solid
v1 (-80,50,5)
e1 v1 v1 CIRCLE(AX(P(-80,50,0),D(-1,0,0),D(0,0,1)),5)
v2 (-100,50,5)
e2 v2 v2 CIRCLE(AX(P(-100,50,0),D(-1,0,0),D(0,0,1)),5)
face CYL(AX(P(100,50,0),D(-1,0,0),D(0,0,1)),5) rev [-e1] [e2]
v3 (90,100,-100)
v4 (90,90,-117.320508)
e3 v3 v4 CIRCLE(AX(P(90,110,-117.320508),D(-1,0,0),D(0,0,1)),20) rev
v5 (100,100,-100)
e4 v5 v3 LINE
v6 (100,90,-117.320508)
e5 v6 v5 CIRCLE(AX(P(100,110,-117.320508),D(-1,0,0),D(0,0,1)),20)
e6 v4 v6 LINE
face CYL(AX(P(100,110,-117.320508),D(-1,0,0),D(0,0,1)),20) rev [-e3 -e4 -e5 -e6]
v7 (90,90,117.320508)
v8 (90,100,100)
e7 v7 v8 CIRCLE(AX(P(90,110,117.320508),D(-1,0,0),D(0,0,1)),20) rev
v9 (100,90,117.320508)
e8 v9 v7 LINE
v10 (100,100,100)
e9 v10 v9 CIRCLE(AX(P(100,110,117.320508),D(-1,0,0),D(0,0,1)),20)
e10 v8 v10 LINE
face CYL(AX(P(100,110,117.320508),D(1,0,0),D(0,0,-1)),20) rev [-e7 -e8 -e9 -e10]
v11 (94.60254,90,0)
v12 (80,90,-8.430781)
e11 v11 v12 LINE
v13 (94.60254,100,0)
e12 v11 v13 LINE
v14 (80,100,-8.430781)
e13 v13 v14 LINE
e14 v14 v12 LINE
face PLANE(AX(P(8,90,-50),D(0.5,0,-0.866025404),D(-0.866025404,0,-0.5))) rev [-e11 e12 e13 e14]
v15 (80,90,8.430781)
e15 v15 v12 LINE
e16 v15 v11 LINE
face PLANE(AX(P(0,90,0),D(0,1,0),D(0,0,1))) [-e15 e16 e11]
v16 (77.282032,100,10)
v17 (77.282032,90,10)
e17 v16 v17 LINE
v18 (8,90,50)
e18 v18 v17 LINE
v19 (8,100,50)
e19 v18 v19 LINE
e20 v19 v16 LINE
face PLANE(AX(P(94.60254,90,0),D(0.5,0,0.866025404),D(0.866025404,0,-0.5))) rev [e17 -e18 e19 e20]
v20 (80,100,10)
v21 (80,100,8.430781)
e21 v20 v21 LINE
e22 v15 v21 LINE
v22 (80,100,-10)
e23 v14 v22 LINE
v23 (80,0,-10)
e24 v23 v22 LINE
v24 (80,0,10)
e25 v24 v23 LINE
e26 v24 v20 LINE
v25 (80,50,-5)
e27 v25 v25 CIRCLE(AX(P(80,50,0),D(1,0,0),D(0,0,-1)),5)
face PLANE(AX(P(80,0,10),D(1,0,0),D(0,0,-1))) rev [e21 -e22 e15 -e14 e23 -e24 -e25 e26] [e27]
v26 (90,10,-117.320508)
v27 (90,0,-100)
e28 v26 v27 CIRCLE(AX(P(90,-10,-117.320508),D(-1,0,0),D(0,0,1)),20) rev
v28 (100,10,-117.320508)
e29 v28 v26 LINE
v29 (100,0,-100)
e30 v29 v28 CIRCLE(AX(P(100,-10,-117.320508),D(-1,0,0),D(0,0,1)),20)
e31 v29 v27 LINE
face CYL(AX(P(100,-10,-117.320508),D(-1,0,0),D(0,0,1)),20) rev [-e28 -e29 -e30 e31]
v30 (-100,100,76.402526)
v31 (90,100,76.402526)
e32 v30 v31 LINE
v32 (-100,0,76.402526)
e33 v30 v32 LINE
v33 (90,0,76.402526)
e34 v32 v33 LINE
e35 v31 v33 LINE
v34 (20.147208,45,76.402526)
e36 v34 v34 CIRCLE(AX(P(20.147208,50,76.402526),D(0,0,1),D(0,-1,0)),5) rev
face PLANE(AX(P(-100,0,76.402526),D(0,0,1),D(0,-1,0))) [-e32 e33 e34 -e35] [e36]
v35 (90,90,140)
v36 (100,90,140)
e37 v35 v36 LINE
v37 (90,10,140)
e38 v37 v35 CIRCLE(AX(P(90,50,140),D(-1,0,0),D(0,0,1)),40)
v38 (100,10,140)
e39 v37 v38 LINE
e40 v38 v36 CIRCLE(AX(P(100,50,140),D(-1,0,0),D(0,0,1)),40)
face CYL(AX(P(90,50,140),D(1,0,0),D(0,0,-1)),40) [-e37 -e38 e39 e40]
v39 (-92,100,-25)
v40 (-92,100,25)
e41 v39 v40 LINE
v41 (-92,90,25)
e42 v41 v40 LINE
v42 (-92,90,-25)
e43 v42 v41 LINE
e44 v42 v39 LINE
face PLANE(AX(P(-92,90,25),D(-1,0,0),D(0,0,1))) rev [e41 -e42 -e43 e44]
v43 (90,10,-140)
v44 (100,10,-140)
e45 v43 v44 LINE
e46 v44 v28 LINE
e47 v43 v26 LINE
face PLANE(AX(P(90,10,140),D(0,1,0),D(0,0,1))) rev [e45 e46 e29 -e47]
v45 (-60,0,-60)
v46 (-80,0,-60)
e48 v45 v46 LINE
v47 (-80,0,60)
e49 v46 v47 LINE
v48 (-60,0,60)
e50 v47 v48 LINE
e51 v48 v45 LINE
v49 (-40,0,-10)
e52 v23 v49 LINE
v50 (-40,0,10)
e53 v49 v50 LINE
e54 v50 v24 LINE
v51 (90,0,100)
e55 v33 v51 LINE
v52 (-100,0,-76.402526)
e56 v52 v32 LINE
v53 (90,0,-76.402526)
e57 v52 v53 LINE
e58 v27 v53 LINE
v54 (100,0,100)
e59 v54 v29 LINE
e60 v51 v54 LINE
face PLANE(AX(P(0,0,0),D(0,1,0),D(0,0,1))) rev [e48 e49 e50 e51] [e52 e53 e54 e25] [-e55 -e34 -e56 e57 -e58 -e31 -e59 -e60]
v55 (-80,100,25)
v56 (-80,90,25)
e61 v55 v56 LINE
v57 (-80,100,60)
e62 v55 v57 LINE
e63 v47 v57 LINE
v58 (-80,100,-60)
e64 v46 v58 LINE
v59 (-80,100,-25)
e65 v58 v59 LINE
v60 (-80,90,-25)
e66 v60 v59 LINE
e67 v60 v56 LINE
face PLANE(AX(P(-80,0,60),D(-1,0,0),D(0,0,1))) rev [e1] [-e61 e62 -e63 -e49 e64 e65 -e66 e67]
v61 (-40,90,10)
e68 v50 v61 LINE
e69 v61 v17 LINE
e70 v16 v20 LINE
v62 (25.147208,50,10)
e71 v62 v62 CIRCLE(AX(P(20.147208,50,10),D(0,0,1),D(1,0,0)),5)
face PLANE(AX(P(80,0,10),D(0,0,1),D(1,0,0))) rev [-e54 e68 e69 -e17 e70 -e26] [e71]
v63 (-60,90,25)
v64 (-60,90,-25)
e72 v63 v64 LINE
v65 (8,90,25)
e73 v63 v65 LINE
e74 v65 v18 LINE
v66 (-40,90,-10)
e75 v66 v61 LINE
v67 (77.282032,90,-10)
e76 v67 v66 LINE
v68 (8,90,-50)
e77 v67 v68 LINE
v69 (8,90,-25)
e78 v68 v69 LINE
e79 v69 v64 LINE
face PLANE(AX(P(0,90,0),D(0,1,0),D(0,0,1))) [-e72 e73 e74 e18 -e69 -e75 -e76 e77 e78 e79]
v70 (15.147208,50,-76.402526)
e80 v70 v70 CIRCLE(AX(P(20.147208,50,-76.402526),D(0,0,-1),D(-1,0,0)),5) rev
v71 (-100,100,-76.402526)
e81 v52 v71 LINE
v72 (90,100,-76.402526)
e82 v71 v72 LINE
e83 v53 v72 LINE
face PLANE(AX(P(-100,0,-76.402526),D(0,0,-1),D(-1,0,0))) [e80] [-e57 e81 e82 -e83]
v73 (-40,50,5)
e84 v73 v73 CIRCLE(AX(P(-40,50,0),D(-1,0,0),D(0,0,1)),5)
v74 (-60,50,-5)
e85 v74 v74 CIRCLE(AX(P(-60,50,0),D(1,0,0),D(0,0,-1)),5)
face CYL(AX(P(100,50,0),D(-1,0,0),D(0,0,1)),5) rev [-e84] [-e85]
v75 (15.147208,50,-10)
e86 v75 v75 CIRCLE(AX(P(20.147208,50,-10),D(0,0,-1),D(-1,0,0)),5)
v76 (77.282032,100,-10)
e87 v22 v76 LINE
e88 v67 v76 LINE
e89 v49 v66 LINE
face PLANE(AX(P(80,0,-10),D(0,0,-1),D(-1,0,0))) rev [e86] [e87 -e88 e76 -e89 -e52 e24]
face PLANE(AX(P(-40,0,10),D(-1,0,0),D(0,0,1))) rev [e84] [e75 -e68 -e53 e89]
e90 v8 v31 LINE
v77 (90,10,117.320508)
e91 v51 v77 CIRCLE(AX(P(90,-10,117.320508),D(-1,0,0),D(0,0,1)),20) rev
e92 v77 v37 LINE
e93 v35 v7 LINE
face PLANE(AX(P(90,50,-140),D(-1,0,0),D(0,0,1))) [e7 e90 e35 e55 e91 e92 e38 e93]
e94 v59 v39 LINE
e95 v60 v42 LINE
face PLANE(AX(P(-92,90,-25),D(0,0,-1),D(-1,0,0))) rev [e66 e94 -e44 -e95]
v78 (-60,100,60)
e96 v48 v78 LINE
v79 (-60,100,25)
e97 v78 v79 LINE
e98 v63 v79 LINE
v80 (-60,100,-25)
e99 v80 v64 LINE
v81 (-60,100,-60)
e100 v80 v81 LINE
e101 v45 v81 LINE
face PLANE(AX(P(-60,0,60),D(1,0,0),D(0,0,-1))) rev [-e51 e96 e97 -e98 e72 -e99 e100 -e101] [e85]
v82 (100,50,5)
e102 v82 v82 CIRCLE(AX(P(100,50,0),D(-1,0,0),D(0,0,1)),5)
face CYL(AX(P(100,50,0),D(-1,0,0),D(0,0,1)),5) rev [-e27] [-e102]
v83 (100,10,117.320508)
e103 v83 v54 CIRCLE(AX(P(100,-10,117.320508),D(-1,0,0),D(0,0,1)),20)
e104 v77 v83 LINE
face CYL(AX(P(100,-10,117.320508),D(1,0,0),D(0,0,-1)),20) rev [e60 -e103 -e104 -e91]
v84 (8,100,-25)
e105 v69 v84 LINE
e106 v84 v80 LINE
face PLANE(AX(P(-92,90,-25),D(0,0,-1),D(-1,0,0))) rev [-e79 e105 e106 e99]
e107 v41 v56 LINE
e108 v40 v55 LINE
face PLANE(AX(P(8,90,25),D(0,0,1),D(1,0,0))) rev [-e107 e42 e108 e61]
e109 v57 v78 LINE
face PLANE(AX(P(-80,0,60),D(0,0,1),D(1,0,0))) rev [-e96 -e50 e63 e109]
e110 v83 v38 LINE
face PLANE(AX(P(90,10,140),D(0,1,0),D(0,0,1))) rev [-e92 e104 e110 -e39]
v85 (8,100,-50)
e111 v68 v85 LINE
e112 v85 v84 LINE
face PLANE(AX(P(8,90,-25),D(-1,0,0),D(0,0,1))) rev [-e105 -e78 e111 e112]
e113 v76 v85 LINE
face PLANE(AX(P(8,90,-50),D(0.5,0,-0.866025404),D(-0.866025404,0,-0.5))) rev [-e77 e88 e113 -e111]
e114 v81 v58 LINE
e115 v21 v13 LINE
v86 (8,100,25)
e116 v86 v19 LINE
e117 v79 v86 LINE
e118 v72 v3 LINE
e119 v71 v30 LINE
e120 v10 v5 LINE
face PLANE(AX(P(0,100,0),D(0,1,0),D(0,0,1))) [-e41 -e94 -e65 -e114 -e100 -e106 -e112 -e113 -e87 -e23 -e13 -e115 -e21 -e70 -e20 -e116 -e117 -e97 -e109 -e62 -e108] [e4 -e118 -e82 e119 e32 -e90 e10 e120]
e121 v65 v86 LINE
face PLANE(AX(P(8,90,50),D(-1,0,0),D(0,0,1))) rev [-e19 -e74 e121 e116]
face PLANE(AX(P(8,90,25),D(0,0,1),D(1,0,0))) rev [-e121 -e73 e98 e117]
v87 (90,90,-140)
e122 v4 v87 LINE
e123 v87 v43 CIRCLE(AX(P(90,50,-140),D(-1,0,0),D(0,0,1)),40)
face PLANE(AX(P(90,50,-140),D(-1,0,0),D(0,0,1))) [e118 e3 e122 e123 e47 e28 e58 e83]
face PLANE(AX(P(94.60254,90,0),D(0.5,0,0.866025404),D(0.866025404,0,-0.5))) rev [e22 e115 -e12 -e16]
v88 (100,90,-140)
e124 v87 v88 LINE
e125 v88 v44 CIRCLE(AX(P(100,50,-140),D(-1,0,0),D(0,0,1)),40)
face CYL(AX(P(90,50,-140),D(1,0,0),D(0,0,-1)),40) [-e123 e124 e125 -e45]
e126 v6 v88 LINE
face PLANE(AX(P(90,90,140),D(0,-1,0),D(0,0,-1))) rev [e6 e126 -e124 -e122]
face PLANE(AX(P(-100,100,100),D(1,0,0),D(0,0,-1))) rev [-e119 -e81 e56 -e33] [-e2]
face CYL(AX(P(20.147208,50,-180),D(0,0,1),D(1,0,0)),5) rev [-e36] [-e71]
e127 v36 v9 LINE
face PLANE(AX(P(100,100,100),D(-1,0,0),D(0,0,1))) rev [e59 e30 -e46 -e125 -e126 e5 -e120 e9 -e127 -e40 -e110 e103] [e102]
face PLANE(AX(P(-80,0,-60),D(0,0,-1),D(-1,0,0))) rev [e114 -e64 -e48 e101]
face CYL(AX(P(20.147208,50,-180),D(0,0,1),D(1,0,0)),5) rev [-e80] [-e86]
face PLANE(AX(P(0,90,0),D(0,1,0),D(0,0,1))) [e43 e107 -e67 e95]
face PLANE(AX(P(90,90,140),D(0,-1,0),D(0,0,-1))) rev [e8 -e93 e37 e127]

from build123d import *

# Parameters (mm, degrees)
SKETCH1_W           = 200
SKETCH1_H           = 200
BOSS_EXTRUDE2_DEPTH = 100
BOSS_EXTRUDE3_DEPTH = 10
CUT_EXTRUDE1_DEPTH  = 10
SKETCH4_W           = 120
SKETCH4_H           = 20
SKETCH4_W_2         = 20
SKETCH4_H_2         = 120
CUT_EXTRUDE2_DEPTH  = 229.910462845
SKETCH5_R           = 5
CUT_EXTRUDE3_DEPTH  = 314.687742827
SKETCH6_R           = 5
CUT_EXTRUDE4_DEPTH  = 288.054001888
SKETCH7_W           = 103.597474358
SKETCH7_H           = 100
CUT_EXTRUDE7_DEPTH  = 281.178514522
FILLET1_R           = 20


with BuildPart() as part:
    # Sketch1 → Boss-Extrude2 (new body)
    with BuildSketch(Plane(origin=(0, 0, 0), x_dir=(1, 0, 0), z_dir=(0, 1, 0))):
        Rectangle(SKETCH1_W, SKETCH1_H)
    extrude(amount=BOSS_EXTRUDE2_DEPTH)

    # Sketch2 → Boss-Extrude3 (add)
    with BuildSketch(Plane.ZY.offset(-100)):
        with BuildLine():
            Line((140, 10), (-140, 10))
            ThreePointArc((-140, 10), (-180, 50), (-140, 90))
            Line((-140, 90), (140, 90))
            ThreePointArc((140, 90), (180, 50), (140, 10))
        make_face()
    extrude(amount=BOSS_EXTRUDE3_DEPTH)

    # Sketch3 → Cut-Extrude1 (cut)
    with BuildSketch(Plane(origin=(0, 100, 0), x_dir=(1, 0, 0), z_dir=(0, 1, 0))):
        Polygon((8, 25), (8, 50), (94.602540378, 0), (8, -50), (8, -25), (-92, -25), (-92, 25), align=None)
    extrude(amount=-CUT_EXTRUDE1_DEPTH, mode=Mode.SUBTRACT)

    # Sketch4 → Cut-Extrude2 (cut, through all)
    with BuildSketch(Plane(origin=(0, 100, 0), x_dir=(1, 0, 0), z_dir=(0, 1, 0))):
        with Locations((20, 0)):
            Rectangle(SKETCH4_W, SKETCH4_H)
        with Locations((-70, 0)):
            Rectangle(SKETCH4_W_2, SKETCH4_H_2)
    extrude(amount=-CUT_EXTRUDE2_DEPTH, mode=Mode.SUBTRACT)

    # Sketch5 → Cut-Extrude3 (cut, through all)
    with BuildSketch(Plane.XY.offset(100)):
        with Locations((20.147207668, 50)):
            Circle(SKETCH5_R)
    extrude(amount=-CUT_EXTRUDE3_DEPTH, mode=Mode.SUBTRACT)

    # Sketch6 → Cut-Extrude4 (cut, through all)
    with BuildSketch(Plane.ZY.offset(100)):
        with Locations((0, 50)):
            Circle(SKETCH6_R)
    extrude(amount=-CUT_EXTRUDE4_DEPTH, mode=Mode.SUBTRACT)

    # Sketch7 → Cut-Extrude7 (cut, through all)
    with BuildSketch(Plane.ZY.offset(-90)):
        with Locations((-128.201262821, 50)):
            Rectangle(SKETCH7_W, SKETCH7_H)
        with Locations((128.201262821, 50)):
            Rectangle(SKETCH7_W, SKETCH7_H)
    extrude(amount=CUT_EXTRUDE7_DEPTH, mode=Mode.SUBTRACT)

    # Fillet1
    # the kernel refuses this fillet: 20 mm, written as the material it adds along each edge
    with BuildSketch(Plane(origin=(100, 10, -100), x_dir=(0, -1, 0), z_dir=(-1, 0, 0)), Plane(origin=(90, 10, 100), x_dir=(0, -1, 0), z_dir=(1, 0, 0))) as fillet1_piece_1:
        with BuildLine():
            CenterArc((20, -17.320508076), FILLET1_R, 120, 60)
            Line((0, -17.320508076), (-0.4, -17.320508076))
            Line((-0.4, -17.320508076), (-0.4, 0))
            Line((-0.4, 0), (0, 0.4))
            ThreePointArc((0, 0.4), (5, 0.4), (9.8, 0.346410162))
            Line((9.8, 0.346410162), (10, 0))
        make_face()
    extrude(amount=10)
    with BuildSketch(Plane(origin=(90, 90, -100), x_dir=(0, 0, -1), z_dir=(1, 0, 0)), Plane(origin=(100, 90, 100), x_dir=(0, 0, 1), z_dir=(-1, 0, 0))) as fillet1_piece_2:
        with BuildLine():
            CenterArc((17.320508076, 20), FILLET1_R, 210, 60)
            Line((0, 10), (-0.346410162, 9.8))
            ThreePointArc((-0.346410162, 9.8), (-0.4, 5), (-0.4, 0))
            Line((-0.4, 0), (0, -0.4))
            Line((0, -0.4), (17.320508076, -0.4))
            Line((17.320508076, -0.4), (17.320508076, 0))
        make_face()
    extrude(amount=10)


solid = part.part
